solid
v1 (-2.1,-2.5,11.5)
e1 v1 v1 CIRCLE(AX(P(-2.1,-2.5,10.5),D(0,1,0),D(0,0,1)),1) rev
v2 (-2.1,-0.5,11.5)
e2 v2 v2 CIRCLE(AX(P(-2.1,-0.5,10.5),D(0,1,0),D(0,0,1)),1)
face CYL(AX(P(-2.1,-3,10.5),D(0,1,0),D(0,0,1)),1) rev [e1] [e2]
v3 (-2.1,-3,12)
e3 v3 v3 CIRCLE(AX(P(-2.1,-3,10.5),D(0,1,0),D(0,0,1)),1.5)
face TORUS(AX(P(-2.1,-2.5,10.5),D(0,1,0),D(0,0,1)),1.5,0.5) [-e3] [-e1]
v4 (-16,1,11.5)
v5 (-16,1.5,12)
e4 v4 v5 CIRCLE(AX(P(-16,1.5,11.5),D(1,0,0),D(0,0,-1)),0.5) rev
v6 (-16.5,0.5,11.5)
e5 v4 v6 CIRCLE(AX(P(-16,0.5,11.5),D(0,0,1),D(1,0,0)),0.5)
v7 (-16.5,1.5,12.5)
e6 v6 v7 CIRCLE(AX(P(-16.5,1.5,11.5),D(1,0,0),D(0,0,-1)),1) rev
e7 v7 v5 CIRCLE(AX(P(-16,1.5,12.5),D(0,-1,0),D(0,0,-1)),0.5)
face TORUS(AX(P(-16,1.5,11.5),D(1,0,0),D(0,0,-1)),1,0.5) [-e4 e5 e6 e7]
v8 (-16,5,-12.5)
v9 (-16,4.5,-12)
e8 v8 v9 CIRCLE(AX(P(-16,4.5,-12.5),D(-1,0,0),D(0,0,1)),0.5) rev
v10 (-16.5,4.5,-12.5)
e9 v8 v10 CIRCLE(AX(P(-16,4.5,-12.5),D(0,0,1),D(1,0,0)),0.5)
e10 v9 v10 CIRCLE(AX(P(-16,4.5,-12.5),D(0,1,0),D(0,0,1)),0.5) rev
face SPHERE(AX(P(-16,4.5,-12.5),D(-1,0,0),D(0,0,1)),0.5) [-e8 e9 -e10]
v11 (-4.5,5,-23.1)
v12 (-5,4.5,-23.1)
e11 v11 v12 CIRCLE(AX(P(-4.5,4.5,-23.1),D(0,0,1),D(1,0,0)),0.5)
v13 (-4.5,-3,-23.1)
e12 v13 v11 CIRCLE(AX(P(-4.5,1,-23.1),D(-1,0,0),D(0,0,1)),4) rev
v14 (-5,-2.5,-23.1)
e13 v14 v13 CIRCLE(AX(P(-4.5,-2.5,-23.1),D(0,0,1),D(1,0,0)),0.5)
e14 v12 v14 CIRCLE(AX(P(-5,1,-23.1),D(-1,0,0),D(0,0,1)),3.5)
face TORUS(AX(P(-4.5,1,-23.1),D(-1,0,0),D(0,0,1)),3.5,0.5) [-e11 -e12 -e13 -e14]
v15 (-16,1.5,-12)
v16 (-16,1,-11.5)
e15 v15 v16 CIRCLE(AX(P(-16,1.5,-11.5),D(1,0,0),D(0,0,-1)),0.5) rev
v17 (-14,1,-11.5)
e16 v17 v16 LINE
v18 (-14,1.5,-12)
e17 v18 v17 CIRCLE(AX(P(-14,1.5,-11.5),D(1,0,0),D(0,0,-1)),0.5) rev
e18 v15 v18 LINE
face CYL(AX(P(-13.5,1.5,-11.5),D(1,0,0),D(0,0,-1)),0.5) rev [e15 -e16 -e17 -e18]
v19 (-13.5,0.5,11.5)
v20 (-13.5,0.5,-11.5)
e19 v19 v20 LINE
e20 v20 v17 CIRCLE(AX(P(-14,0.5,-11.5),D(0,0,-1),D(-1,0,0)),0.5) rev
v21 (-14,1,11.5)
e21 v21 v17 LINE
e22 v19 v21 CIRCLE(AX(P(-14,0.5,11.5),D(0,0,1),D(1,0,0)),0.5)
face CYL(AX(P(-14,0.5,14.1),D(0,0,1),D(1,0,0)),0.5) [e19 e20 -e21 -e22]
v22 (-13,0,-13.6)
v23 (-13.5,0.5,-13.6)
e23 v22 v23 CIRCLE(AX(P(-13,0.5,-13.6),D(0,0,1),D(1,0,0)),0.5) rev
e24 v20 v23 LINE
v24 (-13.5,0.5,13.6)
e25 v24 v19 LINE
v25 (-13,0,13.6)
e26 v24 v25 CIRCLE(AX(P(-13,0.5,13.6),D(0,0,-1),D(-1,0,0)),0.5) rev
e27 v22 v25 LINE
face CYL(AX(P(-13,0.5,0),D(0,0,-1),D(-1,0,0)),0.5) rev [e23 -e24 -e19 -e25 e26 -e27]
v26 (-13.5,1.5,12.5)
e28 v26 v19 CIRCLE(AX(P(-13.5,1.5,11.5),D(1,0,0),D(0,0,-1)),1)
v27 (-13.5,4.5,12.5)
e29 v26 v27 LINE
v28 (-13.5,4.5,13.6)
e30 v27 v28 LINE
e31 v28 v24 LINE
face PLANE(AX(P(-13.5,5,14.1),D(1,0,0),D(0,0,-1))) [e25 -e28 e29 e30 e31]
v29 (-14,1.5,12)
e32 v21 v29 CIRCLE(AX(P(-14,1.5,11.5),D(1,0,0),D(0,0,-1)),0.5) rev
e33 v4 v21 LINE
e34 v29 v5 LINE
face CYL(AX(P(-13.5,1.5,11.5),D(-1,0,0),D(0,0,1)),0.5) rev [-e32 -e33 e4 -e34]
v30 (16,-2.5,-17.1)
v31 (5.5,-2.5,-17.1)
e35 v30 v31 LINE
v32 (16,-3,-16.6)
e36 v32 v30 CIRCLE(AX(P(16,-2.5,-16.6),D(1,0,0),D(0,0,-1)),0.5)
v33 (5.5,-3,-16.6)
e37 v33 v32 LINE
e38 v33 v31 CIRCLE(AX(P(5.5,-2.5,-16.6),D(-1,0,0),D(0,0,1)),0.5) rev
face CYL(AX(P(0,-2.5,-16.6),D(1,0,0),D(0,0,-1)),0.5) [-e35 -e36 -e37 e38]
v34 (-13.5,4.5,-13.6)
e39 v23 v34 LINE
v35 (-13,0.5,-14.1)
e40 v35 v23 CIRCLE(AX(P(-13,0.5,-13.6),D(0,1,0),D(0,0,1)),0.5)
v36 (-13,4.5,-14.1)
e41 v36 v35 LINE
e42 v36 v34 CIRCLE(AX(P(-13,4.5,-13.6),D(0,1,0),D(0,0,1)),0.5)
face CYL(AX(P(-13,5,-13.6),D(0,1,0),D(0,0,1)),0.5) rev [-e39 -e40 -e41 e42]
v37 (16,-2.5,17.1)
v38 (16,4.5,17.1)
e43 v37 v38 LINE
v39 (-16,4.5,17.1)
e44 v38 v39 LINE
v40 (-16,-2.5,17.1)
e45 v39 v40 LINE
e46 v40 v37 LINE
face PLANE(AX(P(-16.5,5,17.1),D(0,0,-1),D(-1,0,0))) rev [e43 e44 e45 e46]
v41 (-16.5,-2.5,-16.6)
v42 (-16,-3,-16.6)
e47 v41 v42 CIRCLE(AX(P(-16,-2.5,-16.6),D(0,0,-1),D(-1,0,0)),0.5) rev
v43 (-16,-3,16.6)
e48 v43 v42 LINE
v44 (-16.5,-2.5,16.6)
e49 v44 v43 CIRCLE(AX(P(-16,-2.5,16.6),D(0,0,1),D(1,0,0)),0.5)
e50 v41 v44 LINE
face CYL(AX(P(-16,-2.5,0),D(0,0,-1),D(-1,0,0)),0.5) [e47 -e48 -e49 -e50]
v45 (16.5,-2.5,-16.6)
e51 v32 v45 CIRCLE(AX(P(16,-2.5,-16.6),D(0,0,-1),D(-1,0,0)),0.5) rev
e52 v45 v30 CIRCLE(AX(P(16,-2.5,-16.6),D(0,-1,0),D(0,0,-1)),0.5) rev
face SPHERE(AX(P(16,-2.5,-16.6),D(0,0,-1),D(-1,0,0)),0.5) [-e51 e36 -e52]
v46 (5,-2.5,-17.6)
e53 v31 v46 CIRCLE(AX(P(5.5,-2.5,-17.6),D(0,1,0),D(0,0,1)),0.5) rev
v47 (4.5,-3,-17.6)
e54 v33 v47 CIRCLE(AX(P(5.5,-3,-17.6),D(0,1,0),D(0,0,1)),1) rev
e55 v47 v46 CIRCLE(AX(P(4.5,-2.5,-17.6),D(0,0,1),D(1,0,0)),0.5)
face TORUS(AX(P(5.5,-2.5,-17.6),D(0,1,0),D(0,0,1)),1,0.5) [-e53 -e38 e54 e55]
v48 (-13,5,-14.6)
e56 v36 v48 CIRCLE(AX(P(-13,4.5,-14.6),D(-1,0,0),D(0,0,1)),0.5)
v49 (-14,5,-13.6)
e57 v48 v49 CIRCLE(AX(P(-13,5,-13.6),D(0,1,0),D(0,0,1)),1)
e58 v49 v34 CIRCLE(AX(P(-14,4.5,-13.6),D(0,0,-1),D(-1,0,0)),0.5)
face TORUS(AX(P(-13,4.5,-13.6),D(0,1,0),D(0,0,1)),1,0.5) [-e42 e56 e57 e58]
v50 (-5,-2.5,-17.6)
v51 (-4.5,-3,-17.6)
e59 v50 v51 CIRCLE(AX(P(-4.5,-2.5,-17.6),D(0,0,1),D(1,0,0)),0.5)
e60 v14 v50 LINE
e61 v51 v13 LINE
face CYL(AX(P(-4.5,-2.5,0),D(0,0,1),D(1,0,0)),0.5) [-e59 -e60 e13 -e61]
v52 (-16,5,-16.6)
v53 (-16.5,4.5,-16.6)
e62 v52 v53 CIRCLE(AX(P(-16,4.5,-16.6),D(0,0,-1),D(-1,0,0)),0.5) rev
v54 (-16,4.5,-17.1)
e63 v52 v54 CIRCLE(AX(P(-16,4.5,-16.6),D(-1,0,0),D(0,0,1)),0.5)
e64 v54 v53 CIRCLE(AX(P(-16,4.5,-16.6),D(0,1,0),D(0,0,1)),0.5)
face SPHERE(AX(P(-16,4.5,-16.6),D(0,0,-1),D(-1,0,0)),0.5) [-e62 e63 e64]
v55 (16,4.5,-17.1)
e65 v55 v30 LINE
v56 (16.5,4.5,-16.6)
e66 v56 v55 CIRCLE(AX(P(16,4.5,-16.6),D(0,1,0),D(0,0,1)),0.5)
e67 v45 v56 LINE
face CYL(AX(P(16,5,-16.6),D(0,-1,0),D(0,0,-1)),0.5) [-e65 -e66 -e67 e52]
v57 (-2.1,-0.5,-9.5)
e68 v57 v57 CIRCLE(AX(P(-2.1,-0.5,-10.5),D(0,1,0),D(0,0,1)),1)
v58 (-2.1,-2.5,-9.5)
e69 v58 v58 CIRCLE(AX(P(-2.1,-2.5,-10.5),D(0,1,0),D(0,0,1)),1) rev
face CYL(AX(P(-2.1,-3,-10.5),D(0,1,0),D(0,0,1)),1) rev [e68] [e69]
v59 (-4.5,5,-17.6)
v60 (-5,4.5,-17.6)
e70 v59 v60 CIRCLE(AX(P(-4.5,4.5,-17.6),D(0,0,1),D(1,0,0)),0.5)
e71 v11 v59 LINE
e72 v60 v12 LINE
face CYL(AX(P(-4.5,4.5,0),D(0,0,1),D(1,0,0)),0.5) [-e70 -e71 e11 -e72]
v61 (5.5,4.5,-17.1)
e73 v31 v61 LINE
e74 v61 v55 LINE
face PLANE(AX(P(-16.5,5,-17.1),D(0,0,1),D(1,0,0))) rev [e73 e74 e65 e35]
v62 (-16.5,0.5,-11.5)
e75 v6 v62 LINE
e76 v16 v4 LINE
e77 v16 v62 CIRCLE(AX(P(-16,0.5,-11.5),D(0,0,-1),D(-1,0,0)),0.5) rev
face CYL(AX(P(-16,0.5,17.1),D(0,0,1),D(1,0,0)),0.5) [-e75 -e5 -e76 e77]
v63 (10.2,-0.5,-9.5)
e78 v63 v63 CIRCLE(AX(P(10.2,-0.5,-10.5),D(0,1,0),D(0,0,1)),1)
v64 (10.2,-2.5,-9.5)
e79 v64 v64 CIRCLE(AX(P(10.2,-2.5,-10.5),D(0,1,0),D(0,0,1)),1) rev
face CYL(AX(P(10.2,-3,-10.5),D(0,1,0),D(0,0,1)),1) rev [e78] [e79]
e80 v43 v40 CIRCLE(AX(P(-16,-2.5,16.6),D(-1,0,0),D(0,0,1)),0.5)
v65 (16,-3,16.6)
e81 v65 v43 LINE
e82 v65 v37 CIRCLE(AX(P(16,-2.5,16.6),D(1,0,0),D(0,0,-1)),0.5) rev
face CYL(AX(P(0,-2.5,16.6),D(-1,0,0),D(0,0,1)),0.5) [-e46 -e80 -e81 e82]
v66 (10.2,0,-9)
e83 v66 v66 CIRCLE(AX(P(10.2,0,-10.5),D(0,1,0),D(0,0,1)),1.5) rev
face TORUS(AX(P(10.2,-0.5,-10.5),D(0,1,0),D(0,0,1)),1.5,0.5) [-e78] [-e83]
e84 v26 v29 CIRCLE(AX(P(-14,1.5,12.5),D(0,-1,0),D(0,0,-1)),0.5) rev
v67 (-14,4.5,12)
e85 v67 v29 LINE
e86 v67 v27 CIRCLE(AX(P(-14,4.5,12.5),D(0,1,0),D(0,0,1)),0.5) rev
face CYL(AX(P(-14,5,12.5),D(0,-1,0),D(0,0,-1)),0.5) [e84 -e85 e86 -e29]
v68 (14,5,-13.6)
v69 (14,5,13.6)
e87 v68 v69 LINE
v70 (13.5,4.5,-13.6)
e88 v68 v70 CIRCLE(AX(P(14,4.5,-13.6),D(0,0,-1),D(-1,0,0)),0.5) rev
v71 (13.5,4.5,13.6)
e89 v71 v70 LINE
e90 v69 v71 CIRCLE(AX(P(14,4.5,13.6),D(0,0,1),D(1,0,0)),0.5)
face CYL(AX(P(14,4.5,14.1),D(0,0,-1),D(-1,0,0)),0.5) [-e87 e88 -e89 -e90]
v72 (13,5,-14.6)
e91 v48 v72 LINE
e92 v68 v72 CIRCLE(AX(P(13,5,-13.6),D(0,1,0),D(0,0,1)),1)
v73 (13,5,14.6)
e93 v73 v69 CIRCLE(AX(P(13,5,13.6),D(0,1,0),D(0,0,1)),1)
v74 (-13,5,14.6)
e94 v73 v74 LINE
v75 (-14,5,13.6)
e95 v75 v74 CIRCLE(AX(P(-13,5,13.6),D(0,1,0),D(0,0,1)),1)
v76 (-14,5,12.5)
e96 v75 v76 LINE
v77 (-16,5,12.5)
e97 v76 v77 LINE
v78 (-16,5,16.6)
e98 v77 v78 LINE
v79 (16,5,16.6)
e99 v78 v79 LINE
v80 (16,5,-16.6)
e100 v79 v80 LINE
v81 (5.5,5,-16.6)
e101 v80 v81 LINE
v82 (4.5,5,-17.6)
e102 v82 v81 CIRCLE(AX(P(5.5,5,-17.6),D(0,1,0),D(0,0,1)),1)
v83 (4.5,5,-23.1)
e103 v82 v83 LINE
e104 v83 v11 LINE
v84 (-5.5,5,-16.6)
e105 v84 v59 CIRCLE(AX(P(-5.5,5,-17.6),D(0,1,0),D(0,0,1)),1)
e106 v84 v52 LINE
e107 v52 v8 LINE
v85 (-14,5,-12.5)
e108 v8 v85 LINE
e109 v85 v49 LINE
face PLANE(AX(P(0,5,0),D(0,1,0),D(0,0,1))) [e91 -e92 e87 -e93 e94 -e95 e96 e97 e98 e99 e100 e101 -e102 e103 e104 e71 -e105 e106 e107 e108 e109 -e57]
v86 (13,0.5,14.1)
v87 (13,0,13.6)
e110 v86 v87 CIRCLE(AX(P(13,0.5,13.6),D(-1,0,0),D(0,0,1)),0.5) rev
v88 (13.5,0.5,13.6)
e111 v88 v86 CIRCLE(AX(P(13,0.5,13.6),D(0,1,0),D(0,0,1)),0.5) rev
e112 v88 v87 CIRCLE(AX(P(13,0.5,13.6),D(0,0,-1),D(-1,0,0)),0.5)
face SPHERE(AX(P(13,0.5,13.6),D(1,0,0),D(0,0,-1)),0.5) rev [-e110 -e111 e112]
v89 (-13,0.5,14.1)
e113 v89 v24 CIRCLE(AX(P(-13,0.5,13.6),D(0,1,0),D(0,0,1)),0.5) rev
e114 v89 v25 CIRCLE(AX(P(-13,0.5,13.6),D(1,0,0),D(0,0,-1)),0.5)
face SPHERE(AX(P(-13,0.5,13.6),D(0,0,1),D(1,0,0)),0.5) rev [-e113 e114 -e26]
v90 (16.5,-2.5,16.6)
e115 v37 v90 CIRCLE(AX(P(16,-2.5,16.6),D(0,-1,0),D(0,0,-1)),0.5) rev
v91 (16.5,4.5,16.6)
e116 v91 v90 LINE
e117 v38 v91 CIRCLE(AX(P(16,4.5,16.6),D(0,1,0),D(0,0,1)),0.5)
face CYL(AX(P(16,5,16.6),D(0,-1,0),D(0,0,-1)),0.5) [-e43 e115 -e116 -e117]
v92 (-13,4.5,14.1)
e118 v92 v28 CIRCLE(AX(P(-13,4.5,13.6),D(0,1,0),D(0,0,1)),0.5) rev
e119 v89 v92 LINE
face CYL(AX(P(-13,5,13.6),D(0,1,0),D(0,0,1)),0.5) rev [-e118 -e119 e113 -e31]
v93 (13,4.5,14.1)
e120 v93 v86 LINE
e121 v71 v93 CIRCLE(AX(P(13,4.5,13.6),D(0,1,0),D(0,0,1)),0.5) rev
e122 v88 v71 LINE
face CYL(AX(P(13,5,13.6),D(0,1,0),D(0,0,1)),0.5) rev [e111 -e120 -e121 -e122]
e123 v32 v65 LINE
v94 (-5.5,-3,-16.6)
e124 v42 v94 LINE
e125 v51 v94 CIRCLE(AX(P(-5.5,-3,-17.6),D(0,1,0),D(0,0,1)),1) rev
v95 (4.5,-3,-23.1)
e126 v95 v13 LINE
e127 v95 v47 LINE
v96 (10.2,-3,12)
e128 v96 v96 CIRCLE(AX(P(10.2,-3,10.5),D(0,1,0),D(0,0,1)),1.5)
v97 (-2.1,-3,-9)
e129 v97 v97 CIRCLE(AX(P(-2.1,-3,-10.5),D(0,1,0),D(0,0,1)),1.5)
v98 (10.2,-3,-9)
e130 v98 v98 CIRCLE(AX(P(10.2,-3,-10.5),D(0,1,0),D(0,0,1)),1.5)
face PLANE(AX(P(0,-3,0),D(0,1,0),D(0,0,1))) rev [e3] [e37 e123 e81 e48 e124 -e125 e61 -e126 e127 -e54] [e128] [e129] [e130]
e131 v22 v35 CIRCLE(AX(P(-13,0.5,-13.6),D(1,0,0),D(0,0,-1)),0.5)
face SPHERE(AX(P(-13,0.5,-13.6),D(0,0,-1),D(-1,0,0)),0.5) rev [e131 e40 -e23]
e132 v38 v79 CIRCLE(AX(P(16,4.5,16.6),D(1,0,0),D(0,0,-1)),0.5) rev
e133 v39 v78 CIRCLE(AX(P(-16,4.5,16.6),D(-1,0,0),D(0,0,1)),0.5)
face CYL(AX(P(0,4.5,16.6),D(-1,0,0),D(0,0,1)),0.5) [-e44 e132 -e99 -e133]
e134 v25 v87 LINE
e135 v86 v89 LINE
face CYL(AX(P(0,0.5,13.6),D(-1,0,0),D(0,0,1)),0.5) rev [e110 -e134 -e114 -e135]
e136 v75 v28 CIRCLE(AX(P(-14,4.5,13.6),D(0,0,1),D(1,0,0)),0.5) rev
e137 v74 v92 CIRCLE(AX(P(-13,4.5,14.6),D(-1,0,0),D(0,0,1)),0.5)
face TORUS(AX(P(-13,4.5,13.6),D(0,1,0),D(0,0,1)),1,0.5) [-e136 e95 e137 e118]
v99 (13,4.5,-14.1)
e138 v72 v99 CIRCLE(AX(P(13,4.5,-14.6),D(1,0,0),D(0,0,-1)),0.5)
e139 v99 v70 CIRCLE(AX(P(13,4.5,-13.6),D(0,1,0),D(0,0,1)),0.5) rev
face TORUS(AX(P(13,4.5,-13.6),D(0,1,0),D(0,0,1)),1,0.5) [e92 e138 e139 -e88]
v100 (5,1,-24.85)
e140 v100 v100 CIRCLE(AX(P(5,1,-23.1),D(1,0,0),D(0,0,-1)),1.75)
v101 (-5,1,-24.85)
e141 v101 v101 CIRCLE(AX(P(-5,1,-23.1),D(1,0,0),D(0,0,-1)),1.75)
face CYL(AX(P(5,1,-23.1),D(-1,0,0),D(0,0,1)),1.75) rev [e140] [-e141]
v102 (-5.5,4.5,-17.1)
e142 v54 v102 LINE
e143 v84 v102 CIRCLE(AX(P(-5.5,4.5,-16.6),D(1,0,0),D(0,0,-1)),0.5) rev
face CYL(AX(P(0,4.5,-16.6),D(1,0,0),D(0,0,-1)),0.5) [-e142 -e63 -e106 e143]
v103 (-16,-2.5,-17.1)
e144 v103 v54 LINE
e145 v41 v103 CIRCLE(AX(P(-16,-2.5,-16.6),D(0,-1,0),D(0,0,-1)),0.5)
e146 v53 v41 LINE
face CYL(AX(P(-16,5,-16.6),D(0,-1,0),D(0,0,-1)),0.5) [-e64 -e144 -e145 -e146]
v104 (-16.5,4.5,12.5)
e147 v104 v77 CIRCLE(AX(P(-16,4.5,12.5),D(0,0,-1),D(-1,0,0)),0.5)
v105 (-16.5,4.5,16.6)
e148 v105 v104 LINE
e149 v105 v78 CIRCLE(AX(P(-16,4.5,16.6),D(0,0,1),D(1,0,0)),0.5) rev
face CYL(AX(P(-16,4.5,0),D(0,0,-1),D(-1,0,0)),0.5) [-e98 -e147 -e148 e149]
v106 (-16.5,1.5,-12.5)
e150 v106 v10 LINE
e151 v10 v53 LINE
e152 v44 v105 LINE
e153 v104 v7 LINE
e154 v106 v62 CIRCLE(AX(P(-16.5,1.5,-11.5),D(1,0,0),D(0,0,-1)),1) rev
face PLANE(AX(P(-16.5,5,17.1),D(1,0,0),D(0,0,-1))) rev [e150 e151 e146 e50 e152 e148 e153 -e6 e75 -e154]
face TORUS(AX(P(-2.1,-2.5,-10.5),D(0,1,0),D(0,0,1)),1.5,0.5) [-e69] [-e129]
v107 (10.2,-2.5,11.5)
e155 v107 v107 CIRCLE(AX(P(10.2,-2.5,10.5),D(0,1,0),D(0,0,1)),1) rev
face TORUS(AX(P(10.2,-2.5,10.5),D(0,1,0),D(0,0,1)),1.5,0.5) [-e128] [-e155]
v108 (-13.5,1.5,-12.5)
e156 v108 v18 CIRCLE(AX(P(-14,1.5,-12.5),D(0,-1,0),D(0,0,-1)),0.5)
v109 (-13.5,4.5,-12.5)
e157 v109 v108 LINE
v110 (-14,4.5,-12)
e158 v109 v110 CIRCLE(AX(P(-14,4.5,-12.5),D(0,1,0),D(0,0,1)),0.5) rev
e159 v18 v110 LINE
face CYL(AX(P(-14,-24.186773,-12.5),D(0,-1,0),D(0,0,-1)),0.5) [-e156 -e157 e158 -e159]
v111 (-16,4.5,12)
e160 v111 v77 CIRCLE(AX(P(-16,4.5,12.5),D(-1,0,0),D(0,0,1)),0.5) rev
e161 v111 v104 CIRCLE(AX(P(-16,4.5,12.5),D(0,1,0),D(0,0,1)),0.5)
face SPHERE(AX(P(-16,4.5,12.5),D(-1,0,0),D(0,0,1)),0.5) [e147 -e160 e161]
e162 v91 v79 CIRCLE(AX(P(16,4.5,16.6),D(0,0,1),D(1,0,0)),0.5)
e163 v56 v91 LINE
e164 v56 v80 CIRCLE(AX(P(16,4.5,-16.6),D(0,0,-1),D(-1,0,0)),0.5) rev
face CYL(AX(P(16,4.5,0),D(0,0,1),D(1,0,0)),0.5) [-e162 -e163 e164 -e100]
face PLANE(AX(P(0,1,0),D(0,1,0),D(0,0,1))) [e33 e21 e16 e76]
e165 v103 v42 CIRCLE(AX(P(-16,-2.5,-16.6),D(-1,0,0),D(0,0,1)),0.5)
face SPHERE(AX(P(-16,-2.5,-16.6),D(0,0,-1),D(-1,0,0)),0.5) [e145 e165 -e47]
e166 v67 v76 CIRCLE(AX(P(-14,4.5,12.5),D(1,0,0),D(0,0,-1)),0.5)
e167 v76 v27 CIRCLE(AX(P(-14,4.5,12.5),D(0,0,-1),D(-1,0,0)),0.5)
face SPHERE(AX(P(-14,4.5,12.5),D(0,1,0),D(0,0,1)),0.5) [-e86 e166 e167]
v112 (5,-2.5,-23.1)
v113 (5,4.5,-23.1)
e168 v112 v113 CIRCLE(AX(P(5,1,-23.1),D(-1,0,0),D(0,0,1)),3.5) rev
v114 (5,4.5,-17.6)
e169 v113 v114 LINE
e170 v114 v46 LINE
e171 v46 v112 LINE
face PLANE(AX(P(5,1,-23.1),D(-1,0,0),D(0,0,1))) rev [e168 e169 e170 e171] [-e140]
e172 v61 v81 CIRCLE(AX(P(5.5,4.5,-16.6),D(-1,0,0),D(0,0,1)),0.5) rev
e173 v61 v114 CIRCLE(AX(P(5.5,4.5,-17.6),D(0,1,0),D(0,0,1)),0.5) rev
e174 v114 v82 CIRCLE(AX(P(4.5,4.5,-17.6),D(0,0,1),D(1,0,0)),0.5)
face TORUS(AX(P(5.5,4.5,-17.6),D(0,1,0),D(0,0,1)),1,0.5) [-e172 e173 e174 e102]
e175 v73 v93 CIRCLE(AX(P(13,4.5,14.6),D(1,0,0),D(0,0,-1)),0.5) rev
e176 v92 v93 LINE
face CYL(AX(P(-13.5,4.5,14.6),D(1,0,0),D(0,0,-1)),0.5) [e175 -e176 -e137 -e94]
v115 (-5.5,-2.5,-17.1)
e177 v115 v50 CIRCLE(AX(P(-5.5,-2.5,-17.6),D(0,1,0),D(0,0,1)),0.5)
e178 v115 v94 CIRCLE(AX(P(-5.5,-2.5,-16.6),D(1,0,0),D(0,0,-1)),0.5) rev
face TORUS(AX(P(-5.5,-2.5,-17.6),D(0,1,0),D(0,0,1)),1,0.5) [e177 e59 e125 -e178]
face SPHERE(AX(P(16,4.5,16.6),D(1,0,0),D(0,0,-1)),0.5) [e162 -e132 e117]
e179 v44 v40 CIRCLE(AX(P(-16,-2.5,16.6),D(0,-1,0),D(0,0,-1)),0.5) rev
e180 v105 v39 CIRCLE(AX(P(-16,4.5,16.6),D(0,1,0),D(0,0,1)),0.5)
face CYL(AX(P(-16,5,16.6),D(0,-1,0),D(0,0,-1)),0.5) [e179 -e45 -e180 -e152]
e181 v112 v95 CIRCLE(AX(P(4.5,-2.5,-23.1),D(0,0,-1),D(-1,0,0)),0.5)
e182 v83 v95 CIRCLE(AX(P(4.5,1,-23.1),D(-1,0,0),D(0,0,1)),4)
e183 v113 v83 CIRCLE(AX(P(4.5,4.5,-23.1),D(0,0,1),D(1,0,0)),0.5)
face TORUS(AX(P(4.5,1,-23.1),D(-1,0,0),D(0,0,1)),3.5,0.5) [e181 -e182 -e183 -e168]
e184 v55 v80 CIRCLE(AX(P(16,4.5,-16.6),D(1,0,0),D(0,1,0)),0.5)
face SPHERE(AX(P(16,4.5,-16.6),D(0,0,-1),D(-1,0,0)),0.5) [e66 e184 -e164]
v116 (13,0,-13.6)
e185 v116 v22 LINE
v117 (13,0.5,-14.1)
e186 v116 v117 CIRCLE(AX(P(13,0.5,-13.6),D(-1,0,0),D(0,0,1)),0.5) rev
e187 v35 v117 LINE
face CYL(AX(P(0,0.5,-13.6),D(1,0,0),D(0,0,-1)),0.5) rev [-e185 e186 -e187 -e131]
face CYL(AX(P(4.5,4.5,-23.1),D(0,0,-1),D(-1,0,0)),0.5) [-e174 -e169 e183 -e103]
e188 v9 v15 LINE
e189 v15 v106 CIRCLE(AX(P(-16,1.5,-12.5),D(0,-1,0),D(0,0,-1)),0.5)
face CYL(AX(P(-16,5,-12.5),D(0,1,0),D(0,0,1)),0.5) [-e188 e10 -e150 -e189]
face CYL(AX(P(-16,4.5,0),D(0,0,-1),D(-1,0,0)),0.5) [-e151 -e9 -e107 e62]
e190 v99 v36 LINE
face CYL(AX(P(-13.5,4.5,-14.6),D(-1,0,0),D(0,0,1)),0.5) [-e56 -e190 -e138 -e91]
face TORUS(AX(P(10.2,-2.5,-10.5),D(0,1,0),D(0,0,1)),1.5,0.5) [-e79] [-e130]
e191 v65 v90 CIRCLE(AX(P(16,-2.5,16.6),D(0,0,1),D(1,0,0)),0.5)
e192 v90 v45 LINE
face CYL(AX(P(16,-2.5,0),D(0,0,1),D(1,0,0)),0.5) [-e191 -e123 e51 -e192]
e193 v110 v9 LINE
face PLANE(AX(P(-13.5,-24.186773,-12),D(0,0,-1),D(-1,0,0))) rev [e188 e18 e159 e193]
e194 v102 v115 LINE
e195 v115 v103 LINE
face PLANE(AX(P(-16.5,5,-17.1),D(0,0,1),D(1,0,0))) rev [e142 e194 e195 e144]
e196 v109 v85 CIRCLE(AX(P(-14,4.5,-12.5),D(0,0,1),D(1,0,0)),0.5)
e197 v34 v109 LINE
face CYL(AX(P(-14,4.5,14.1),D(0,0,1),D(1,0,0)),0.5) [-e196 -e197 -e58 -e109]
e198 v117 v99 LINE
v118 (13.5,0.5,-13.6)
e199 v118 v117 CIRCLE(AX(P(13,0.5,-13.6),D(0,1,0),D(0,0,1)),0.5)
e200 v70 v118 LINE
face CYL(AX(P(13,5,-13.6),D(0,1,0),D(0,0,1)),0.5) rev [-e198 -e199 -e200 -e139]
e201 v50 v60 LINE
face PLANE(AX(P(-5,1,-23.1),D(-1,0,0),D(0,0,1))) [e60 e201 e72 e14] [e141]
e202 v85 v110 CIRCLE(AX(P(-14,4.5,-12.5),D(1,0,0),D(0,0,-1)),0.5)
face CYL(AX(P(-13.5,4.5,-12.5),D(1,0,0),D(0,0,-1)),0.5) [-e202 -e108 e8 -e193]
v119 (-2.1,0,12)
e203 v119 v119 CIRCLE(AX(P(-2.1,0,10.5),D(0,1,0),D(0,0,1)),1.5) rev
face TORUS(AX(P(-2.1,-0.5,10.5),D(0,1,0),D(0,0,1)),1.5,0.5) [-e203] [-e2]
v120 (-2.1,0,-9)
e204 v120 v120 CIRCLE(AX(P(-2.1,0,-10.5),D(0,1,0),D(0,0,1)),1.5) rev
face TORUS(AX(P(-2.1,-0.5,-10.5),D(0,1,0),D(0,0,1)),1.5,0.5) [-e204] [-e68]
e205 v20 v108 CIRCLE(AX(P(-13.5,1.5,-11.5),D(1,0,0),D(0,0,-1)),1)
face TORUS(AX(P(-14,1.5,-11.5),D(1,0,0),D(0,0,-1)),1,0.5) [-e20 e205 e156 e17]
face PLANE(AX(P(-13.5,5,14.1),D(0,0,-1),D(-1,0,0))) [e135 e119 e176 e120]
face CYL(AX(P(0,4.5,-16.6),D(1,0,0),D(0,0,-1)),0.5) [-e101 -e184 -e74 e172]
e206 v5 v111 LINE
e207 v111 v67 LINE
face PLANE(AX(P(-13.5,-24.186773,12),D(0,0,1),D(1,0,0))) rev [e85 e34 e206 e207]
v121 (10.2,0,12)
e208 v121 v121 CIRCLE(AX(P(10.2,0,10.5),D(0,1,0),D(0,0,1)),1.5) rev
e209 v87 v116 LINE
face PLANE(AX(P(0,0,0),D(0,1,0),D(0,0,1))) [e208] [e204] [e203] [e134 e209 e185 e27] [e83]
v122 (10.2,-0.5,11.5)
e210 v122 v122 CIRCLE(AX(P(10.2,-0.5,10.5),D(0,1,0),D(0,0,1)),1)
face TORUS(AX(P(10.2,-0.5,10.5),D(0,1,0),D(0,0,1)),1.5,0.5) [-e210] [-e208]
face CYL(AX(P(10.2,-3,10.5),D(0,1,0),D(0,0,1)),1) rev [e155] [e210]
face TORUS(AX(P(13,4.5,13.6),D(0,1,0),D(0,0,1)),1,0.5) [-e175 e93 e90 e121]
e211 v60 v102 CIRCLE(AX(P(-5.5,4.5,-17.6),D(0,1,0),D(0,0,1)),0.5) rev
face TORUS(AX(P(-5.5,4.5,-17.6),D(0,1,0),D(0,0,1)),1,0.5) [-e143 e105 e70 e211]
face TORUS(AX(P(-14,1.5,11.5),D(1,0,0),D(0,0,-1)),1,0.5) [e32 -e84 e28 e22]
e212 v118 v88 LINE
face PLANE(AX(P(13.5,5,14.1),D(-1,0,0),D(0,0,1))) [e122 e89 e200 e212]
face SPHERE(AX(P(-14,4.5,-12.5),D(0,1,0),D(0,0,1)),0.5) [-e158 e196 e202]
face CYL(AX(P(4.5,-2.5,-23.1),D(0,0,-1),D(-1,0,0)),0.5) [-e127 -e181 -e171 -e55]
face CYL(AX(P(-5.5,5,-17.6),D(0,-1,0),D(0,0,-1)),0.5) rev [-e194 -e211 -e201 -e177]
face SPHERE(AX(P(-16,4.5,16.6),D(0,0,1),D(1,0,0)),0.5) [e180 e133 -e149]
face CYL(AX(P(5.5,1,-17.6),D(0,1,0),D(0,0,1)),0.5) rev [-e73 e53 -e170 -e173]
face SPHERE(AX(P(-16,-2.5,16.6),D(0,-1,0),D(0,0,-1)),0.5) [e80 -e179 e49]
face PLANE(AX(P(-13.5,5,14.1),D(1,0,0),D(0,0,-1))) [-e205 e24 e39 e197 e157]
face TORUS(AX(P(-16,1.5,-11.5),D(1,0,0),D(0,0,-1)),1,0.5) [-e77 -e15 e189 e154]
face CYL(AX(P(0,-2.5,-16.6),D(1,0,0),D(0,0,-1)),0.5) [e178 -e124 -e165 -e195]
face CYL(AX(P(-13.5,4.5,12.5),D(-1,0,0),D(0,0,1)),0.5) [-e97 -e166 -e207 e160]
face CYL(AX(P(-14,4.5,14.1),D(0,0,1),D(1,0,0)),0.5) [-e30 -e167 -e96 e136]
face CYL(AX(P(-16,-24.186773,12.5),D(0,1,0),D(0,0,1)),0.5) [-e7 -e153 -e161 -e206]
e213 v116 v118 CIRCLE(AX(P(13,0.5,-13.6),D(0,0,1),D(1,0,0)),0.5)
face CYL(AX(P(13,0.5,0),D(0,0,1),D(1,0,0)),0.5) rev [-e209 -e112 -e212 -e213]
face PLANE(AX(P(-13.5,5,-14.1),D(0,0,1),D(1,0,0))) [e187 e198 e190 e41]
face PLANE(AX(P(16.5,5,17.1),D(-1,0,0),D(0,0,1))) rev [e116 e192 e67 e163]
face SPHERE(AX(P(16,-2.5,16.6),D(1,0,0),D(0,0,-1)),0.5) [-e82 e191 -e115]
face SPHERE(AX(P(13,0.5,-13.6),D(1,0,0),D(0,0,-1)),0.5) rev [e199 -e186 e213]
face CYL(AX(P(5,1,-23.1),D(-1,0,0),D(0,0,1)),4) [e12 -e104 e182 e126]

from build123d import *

# Parameters (mm, degrees)
SKETCH1_W           = 33
SKETCH1_H           = 34.2
SKETCH1_W_2         = 27
SKETCH1_H_2         = 28.2
BOSS_EXTRUDE1_DEPTH = 5
SKETCH2_W           = 33
SKETCH2_H           = 34.2
BOSS_EXTRUDE2_DEPTH = 3
SKETCH3_R           = 1
CUT_EXTRUDE1_DEPTH  = 25.282915805
SKETCH4_W           = 3
SKETCH4_H           = 24
CUT_EXTRUDE2_DEPTH  = 4
SKETCH5_R           = 1.75
BOSS_EXTRUDE3_DEPTH = 5
FILLET1_R           = 0.5


with BuildPart() as part:
    # Sketch1 → Boss-Extrude1 (new body)
    with BuildSketch(Plane(origin=(0, 0, 0), x_dir=(1, 0, 0), z_dir=(0, 1, 0))):
        Rectangle(SKETCH1_W, SKETCH1_H)
        Rectangle(SKETCH1_W_2, SKETCH1_H_2, mode=Mode.SUBTRACT)
    extrude(amount=BOSS_EXTRUDE1_DEPTH)

    # Sketch2 → Boss-Extrude2 (add)
    with BuildSketch(Plane.XZ):
        Rectangle(SKETCH2_W, SKETCH2_H)
    extrude(amount=BOSS_EXTRUDE2_DEPTH)

    # Sketch3 → Cut-Extrude1 (cut, through all)
    with BuildSketch(Plane(origin=(0, 0, 0), x_dir=(1, 0, 0), z_dir=(0, 1, 0))):
        with Locations(Location((-2.1, 10.5, 0), (0, 0, 270))):
            Circle(SKETCH3_R)
        with Locations(Location((10.2, 10.5, 0), (0, 0, 270))):
            Circle(SKETCH3_R)
        with Locations(Location((10.2, -10.5, 0), (0, 0, 270))):
            Circle(SKETCH3_R)
        with Locations(Location((-2.1, -10.5, 0), (0, 0, 270))):
            Circle(SKETCH3_R)
    extrude(amount=-CUT_EXTRUDE1_DEPTH, mode=Mode.SUBTRACT)

    # Sketch4 → Cut-Extrude2 (cut)
    with BuildSketch(Plane(origin=(0, 5, 0), x_dir=(1, 0, 0), z_dir=(0, 1, 0))):
        with Locations((-15, 0)):
            Rectangle(SKETCH4_W, SKETCH4_H)
    extrude(amount=-CUT_EXTRUDE2_DEPTH, mode=Mode.SUBTRACT)

    # Sketch5 → Boss-Extrude3 (add, symmetric)
    with BuildSketch(Plane(origin=(0, 0, 0), x_dir=(0, 0, -1), z_dir=(1, 0, 0))):
        with BuildLine():
            Line((17.1, 5), (23.1, 5))
            ThreePointArc((23.1, 5), (27.1, 1), (23.1, -3))
            Line((23.1, -3), (17.1, -3))
            Line((17.1, -3), (17.1, 5))
        make_face()
        with Locations((23.1, 1)):
            Circle(SKETCH5_R, mode=Mode.SUBTRACT)
    extrude(amount=BOSS_EXTRUDE3_DEPTH, both=True)

    # Fillet1
    fillet1_edges = [part.edges().sort_by_distance(p)[0] for p in [
        (10.75, 5, -17.1),
        (13.5, 0, 0),
        (13.5, 2.5, 14.1),
        (0, 0, -14.1),
        (13.5, 2.5, -14.1),
        (-13.5, 0, 0),
        (-13.5, 2.5, -14.1),
        (0, 0, 14.1),
        (-13.5, 2.5, 14.1),
        (13.5, 5, 0),
        (-16.5, 5, -14.55),
        (0, 5, -14.1),
        (-13.5, 5, -13.05),
        (0, 5, 14.1),
        (16.5, -3, 0),
        (0, -3, 17.1),
        (-16.5, -3, 0),
        (-10.75, -3, -17.1),
        (0, 5, 17.1),
        (-2.1, -3, 9.5),
        (-2.1, 0, 9.5),
        (10.2, -3, 9.5),
        (10.2, 0, 9.5),
        (10.2, -3, -11.5),
        (10.2, 0, -11.5),
        (-2.1, -3, -11.5),
        (-2.1, 0, -11.5),
        (-13.5, 5, 13.05),
        (-16.5, 5, 14.55),
        (-13.5, 3, -12),
        (-13.5, 3, 12),
        (-16.5, 3, 12),
        (-16.5, 3, -12),
        (-15, 5, -12),
        (-15, 5, 12),
        (-13.5, 1, 0),
        (-15, 1, 12),
        (-16.5, 1, 0),
        (-15, 1, -12),
        (-16.5, 1, 17.1),
        (10.75, -3, -17.1),
        (-16.5, 1, -17.1),
        (-10.75, 5, -17.1),
        (16.5, 1, -17.1),
        (5, 1, -17.1),
        (16.5, 1, 17.1),
        (5, -3, -20.1),
        (5, 1, -27.1),
        (5, 5, -20.1),
        (-5, 1, -17.1),
        (-5, -3, -20.1),
        (-5, 1, -27.1),
        (-5, 5, -20.1),
        (16.5, 5, 0),
    ]]
    fillet(fillet1_edges, radius=FILLET1_R - 0.0001)  # a hair under: the kernel refuses the full size


solid = part.part
